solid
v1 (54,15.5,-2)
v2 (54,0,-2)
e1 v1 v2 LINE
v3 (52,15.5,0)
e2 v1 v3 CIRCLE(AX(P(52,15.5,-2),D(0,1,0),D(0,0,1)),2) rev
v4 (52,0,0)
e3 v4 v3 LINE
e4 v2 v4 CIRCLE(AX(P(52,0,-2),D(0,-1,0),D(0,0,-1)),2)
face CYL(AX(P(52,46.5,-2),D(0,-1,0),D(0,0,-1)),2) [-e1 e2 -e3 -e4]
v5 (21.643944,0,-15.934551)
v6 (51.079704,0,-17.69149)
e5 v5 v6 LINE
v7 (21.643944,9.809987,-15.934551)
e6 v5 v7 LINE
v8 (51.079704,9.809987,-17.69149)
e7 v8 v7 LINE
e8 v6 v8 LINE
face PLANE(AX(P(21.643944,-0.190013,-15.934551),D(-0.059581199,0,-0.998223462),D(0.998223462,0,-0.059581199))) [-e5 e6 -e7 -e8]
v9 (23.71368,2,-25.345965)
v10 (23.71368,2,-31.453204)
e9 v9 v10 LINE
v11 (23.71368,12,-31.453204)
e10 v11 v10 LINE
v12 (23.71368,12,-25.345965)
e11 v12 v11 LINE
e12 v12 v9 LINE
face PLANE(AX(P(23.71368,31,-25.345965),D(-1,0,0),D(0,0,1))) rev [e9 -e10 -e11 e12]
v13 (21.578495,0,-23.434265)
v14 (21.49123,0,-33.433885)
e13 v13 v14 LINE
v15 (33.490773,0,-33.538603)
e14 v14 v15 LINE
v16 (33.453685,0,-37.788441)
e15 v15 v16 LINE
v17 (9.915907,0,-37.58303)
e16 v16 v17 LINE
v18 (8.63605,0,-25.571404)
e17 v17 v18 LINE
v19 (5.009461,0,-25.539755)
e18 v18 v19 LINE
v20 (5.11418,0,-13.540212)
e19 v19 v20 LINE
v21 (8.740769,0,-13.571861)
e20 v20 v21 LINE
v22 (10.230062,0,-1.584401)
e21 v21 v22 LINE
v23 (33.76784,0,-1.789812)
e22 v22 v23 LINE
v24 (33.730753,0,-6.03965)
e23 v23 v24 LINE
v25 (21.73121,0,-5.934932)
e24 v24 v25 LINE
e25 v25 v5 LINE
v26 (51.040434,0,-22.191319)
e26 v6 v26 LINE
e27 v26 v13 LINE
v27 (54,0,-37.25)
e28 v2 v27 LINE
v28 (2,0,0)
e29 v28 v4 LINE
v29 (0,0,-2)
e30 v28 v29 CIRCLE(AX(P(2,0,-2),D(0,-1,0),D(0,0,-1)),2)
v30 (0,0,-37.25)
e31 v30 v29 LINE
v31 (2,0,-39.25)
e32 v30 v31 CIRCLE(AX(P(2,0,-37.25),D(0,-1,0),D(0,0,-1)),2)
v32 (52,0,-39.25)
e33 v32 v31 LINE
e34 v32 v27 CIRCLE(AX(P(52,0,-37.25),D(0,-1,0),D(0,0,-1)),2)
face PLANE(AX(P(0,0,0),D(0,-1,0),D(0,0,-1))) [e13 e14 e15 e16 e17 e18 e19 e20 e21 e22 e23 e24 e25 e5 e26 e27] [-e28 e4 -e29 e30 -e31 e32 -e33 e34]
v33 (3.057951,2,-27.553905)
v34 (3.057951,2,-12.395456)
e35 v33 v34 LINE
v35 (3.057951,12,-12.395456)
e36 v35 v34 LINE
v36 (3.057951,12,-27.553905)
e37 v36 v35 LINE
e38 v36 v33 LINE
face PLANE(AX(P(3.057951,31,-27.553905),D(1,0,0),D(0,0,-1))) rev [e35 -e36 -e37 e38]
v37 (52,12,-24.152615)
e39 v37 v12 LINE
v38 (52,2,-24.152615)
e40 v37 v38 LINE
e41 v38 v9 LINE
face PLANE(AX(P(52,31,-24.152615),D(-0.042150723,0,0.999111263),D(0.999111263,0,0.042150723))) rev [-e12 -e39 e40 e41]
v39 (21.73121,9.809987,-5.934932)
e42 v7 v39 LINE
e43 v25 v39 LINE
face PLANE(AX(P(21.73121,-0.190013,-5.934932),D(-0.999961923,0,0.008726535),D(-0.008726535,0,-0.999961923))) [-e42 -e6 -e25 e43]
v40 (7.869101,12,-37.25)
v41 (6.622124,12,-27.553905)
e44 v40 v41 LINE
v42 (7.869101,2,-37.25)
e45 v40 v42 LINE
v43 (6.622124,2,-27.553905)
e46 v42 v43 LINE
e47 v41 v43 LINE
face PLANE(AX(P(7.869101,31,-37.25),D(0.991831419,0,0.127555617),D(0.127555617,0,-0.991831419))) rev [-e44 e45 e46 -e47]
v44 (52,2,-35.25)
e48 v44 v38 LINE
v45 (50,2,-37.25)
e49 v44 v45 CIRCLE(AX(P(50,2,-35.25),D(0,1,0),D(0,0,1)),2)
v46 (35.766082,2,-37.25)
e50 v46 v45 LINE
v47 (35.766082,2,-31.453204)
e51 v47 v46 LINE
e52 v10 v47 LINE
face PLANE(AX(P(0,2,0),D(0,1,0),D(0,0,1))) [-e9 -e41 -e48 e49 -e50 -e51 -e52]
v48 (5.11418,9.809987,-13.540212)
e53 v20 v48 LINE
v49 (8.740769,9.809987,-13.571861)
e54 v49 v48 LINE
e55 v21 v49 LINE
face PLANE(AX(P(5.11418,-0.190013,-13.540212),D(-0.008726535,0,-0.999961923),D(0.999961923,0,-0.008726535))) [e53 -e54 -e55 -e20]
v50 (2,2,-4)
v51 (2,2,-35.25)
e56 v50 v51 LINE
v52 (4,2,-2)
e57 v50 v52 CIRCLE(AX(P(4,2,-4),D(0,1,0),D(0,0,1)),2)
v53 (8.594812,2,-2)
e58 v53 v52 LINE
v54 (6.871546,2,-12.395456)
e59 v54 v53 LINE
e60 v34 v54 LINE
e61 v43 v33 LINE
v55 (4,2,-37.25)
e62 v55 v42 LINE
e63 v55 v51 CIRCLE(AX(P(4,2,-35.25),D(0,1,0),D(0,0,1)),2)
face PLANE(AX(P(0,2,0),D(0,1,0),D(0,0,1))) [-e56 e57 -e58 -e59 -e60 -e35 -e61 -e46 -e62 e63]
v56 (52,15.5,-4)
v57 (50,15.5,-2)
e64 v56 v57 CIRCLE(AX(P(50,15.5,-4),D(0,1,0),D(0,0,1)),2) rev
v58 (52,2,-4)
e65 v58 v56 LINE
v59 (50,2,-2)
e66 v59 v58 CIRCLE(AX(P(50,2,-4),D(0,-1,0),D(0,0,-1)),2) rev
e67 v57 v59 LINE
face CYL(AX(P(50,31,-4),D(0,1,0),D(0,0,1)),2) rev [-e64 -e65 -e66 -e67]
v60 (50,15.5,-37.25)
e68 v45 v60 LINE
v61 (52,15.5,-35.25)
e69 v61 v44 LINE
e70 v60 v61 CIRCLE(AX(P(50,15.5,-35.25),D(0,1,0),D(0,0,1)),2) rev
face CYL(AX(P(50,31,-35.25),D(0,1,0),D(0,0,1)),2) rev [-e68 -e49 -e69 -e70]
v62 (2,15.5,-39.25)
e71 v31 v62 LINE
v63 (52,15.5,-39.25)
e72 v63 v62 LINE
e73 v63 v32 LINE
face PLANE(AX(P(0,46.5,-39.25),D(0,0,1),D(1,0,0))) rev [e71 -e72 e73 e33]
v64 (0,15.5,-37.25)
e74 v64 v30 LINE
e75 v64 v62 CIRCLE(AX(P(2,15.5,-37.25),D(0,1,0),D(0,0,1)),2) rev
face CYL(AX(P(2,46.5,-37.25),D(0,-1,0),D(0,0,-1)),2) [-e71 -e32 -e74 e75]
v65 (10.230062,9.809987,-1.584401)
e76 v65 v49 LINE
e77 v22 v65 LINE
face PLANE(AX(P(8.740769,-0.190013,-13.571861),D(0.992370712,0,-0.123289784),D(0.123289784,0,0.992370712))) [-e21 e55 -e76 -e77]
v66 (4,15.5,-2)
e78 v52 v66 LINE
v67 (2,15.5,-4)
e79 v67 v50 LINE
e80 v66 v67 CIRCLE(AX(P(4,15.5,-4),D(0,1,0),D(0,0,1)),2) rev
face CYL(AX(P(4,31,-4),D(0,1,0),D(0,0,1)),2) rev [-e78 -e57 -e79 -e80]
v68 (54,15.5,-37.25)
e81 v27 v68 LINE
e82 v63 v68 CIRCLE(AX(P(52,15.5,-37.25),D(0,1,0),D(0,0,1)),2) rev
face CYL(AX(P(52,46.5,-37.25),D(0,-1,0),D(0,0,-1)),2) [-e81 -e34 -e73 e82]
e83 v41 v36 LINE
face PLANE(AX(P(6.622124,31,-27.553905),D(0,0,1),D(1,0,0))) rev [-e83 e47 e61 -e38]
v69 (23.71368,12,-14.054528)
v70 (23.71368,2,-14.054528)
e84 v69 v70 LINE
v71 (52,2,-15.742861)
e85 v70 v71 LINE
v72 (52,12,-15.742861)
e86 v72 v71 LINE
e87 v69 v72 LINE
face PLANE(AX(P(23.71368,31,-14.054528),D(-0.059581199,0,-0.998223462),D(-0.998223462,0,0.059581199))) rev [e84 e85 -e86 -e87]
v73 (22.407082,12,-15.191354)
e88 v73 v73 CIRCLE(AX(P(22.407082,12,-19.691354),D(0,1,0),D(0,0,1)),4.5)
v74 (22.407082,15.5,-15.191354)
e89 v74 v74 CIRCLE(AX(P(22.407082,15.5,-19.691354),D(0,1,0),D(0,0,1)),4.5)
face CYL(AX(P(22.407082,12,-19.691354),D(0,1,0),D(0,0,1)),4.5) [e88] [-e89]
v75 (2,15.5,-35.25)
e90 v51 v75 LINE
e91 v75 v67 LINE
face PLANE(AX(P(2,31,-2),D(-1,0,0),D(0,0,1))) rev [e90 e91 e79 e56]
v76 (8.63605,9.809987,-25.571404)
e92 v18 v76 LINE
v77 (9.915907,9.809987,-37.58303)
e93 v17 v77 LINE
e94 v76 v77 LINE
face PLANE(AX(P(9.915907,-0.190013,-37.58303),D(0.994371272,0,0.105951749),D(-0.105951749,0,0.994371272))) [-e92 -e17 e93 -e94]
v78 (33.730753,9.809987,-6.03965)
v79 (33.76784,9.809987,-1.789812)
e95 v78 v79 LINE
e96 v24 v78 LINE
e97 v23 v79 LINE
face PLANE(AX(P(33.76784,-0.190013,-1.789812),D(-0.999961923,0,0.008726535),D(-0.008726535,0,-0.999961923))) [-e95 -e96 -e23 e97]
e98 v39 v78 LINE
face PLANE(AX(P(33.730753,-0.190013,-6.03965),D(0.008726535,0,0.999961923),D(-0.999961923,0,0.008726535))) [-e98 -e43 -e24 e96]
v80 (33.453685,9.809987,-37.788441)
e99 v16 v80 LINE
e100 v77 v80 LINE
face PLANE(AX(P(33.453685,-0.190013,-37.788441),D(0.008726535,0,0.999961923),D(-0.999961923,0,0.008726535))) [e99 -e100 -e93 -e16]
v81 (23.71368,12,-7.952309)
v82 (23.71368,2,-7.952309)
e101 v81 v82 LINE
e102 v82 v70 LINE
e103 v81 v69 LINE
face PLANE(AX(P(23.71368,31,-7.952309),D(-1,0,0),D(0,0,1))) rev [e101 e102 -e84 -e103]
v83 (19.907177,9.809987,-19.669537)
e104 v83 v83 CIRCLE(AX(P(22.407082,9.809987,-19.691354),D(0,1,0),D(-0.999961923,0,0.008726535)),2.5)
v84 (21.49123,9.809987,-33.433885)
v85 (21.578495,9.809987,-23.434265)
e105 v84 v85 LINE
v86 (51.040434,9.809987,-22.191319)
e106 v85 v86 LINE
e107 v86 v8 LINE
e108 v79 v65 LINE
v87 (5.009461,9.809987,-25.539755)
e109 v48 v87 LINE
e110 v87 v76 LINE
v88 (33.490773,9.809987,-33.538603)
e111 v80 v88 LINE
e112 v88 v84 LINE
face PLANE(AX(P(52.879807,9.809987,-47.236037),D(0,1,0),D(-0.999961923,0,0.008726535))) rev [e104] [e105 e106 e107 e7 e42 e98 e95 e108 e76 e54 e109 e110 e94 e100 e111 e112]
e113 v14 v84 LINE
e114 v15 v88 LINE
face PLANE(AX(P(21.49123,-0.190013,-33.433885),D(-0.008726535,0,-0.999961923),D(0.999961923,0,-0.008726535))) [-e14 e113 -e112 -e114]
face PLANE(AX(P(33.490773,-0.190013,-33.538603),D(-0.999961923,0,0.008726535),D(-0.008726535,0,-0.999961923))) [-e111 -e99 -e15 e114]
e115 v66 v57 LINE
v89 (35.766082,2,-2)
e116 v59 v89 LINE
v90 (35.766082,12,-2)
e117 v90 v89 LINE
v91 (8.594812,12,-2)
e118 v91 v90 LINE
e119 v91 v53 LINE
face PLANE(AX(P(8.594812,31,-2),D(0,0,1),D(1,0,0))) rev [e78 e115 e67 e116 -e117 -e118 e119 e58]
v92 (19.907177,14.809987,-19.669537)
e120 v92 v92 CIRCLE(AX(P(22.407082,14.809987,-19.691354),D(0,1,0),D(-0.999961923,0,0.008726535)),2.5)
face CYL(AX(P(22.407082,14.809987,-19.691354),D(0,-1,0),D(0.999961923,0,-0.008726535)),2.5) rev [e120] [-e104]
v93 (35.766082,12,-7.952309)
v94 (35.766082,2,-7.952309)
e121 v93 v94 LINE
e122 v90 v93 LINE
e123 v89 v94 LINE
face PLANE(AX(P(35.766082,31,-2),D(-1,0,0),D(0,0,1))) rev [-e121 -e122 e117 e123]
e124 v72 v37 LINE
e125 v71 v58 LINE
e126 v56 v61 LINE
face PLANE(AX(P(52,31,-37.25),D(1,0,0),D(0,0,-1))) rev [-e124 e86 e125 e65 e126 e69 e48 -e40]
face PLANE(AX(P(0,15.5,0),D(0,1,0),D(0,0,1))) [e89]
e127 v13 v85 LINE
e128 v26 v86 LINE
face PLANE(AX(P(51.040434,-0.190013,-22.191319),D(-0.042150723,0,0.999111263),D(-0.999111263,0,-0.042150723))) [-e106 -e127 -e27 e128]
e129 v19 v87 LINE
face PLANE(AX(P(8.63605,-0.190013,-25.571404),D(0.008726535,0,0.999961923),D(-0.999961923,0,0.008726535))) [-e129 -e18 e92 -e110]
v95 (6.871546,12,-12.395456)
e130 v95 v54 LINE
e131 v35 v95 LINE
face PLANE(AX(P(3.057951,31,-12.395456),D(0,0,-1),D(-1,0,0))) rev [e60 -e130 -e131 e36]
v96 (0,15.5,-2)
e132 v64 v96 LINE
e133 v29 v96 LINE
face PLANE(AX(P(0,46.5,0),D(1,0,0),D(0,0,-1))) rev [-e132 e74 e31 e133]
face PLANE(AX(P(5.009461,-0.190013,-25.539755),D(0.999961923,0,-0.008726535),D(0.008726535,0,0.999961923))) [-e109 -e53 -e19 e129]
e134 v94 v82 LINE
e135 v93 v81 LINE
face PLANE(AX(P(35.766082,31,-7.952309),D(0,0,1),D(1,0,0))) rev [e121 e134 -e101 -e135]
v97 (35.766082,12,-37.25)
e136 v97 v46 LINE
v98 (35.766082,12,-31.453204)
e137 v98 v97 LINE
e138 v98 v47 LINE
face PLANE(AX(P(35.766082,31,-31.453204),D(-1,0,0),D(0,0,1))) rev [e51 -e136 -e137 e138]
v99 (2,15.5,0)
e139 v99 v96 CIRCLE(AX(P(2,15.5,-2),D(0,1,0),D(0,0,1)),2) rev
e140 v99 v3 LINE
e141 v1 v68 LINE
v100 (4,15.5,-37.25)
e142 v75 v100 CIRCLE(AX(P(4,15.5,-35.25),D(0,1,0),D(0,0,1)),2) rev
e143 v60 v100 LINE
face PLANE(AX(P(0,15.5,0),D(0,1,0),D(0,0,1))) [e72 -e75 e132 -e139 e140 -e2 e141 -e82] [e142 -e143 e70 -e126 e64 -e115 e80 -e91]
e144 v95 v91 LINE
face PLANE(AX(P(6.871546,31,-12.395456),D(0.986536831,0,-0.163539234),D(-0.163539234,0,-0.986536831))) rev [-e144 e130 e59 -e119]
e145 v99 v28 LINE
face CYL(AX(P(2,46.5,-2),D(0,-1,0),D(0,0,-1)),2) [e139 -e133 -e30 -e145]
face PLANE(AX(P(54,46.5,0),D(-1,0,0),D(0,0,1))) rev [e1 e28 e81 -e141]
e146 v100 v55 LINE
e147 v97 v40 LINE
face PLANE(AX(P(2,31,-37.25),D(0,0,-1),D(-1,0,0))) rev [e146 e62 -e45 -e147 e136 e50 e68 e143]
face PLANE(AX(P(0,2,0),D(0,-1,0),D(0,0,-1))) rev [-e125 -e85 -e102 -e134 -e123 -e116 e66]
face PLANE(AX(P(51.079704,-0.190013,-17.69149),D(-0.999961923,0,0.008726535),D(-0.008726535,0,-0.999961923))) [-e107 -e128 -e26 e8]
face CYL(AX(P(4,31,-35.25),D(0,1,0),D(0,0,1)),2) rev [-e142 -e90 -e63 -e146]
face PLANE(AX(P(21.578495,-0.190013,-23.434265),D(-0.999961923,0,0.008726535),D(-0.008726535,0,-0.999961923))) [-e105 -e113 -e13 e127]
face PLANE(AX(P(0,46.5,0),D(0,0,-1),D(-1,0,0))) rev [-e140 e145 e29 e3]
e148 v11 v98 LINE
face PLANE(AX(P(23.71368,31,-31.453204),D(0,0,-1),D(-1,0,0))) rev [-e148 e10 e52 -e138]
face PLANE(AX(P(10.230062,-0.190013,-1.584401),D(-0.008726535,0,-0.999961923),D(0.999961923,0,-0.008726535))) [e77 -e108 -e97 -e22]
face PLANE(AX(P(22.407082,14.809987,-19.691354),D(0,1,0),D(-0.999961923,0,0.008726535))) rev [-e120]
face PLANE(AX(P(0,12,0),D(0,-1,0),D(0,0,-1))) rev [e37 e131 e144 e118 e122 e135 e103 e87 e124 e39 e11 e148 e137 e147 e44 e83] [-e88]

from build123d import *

# Parameters (mm, degrees)
SKETCH1_W              = 54
SKETCH1_H              = 39.25
BOSS_EXTRUDE1_DEPTH    = 46.5
FILLET1_R              = 2
FILLET2_R              = 2
Z_95_START             = -0.023652431
Z_95_BLANK_DEPTH       = 10
Z_95_START_2           = -5.023652431
Z_95_BLANK_2_OUTLINE_R = 2.5
Z_95_BLANK_2_DEPTH     = 5
BODY_MOVE_COPY3_ANGLE  = 180
BODY_MOVE_COPY4_ANGLE  = 89.5
SKETCH4_W              = 54
SKETCH4_H              = 39.25
CUT_EXTRUDE1_DEPTH     = 31
CUT_EXTRUDE2_DEPTH     = 31
BOSS_EXTRUDE2_DEPTH    = 2
FILLET3_R              = 2
FILLET4_R              = 2
FILLET5_R              = 2
FILLET6_R              = 2
SKETCH7_R              = 4.5
CUT_EXTRUDE3_DEPTH     = 3.5


with BuildPart() as part:
    # Sketch1 → Boss-Extrude1 (new body)
    with BuildSketch(Plane(origin=(0, 0, 0), x_dir=(1, 0, 0), z_dir=(0, 1, 0))):
        with Locations((27, 19.625)):
            Rectangle(SKETCH1_W, SKETCH1_H)
    extrude(amount=BOSS_EXTRUDE1_DEPTH)

    # Fillet1
    fillet1_edges = [part.edges().sort_by_distance(p)[0] for p in [
        (0, 23.25, 0),
    ]]
    fillet(fillet1_edges, radius=FILLET1_R)

    # Fillet2
    fillet2_edges = [part.edges().sort_by_distance(p)[0] for p in [
        (0, 23.25, -39.25),
        (54, 23.25, -39.25),
        (54, 23.25, 0),
    ]]
    fillet(fillet2_edges, radius=FILLET2_R)


with BuildPart() as body_2:
    # Z-95 Blank: read off the stored shape, not the designer's step
    # Z-95 Blank outline → Z-95 Blank (new body)
    with BuildSketch(Plane(origin=(0, 0, 0), x_dir=(1, 0, 0), z_dir=(0, 1, 0)).offset(Z_95_START)):
        Polygon((-39.475833264, 51.689675598), (-39.475833264, 48.062948495), (-51.475833264, 46.678320586), (-51.475833264, 23.139646129), (-47.225833264, 23.139646129), (-47.225833264, 35.139646129), (-37.225833264, 35.139646129), (-35.725833264, 5.689675598), (-31.225833264, 5.689675598), (-29.725833264, 35.139646129), (-19.725833264, 35.139646129), (-19.725833264, 23.139646129), (-15.475833264, 23.139646129), (-15.475833264, 46.678320586), (-27.475833264, 48.062948495), (-27.475833264, 51.689675598), align=None)
    extrude(amount=Z_95_BLANK_DEPTH)

    # Z-95 Blank 2 outline → Z-95 Blank 2 (add)
    with BuildSketch(Plane(origin=(0, 0, 0), x_dir=(1, 0, 0), z_dir=(0, 1, 0)).offset(Z_95_START_2)):
        with Locations((-33.475833264, 34.343753809)):
            Circle(Z_95_BLANK_2_OUTLINE_R)
    extrude(amount=Z_95_BLANK_2_DEPTH)


with BuildPart() as body_2_1:
    # Body-Move/Copy3: moved
    add(body_2.part.rotate(Axis((0, 2.476347569, -28.689675598), (1, 0, 0)), BODY_MOVE_COPY3_ANGLE))


with BuildPart() as body_2_2:
    # Body-Move/Copy4: moved
    add(body_2_1.part.rotate(Axis((-33.475833264, 0, -28.689675598), (0, -1, 0)), BODY_MOVE_COPY4_ANGLE))


with BuildPart() as body_2_3:
    # Body-Move/Copy5: moved
    add(body_2_2.part.moved(Location((61.536777905, 5.06338101, 8.948981511))))


with BuildPart() as body_2_4:
    # Body-Move/Copy6: moved
    add(body_2_3.part.moved(Location((0, -0.229742035, 0))))


with BuildPart() as part_1:
    add(part.part)

    # Intersect1: read off the stored shape, not the designer's step
    # Intersect1: cut body 2
    add(body_2_4.part, mode=Mode.SUBTRACT)

    # Sketch4 → Cut-Extrude1 (cut)
    with BuildSketch(Plane(origin=(0, 46.5, 0), x_dir=(1, 0, 0), z_dir=(0, 1, 0))):
        with Locations((27, 19.625)):
            Rectangle(SKETCH4_W, SKETCH4_H)
    extrude(amount=-CUT_EXTRUDE1_DEPTH, mode=Mode.SUBTRACT)

    # Sketch5 → Cut-Extrude2 (cut)
    with BuildSketch(Plane(origin=(0, 0, 0), x_dir=(-1, 0, 0), z_dir=(0, -1, 0))):
        Polygon((-23.713680343, 7.952308665), (-23.713680343, 14.054528407), (-52, 15.742860627), (-52, 2), (-35.766082295, 2), (-35.766082295, 7.952308665), align=None)
        Polygon((-23.713680343, 25.345964802), (-23.713680343, 31.453203507), (-35.766082295, 31.453203507), (-35.766082295, 37.25), (-52, 37.25), (-52, 24.152615413), align=None)
        Polygon((-6.871546498, 12.395456139), (-8.594812047, 2), (-2, 2), (-2, 37.25), (-7.869100925, 37.25), (-6.622123507, 27.553904956), (-3.057950712, 27.553904956), (-3.057950712, 12.395456139), align=None)
    extrude(amount=-CUT_EXTRUDE2_DEPTH, mode=Mode.SUBTRACT)

    # Sketch6 → Boss-Extrude2 (add)
    with BuildSketch(Plane.XZ):
        Polygon((52, -24.152615413), (23.713680343, -25.345964802), (23.713680343, -31.453203507), (35.766082295, -31.453203507), (35.766082295, -37.25), (52, -37.25), align=None)
        Polygon((52, -15.742860627), (23.713680343, -14.054528407), (23.713680343, -7.952308665), (35.766082295, -7.952308665), (35.766082295, -2), (52, -2), align=None)
        Polygon((8.594812047, -2), (6.871546498, -12.395456139), (3.057950712, -12.395456139), (3.057950712, -27.553904956), (6.622123507, -27.553904956), (7.869100925, -37.25), (2, -37.25), (2, -2), align=None)
    extrude(amount=-BOSS_EXTRUDE2_DEPTH)

    # Fillet3
    fillet3_edges = [part_1.edges().sort_by_distance(p)[0] for p in [
        (52, 8.75, -2),
    ]]
    fillet(fillet3_edges, radius=FILLET3_R)

    # Fillet4
    fillet4_edges = [part_1.edges().sort_by_distance(p)[0] for p in [
        (2, 8.75, -2),
    ]]
    fillet(fillet4_edges, radius=FILLET4_R)

    # Fillet5
    fillet5_edges = [part_1.edges().sort_by_distance(p)[0] for p in [
        (52, 8.75, -37.25),
    ]]
    fillet(fillet5_edges, radius=FILLET5_R)

    # Fillet6
    fillet6_edges = [part_1.edges().sort_by_distance(p)[0] for p in [
        (2, 8.75, -37.25),
    ]]
    fillet(fillet6_edges, radius=FILLET6_R)

    # Sketch7 → Cut-Extrude3 (cut)
    with BuildSketch(Plane(origin=(0, 15.5, 0), x_dir=(1, 0, 0), z_dir=(0, 1, 0))):
        Polygon((7.869100925, 37.25), (35.766082295, 37.25), (35.766082295, 31.453203507), (23.713680343, 31.453203507), (23.713680343, 25.345964802), (52, 24.152615413), (52, 15.742860627), (23.713680343, 14.054528407), (23.713680343, 7.952308665), (35.766082295, 7.952308665), (35.766082295, 2), (8.594812047, 2), (6.871546498, 12.395456139), (3.057950712, 12.395456139), (3.057950712, 27.553904956), (6.622123507, 27.553904956), align=None)
        with Locations(Location((22.40708172, 19.691353573, 0), (0, 0, 270))):
            Circle(SKETCH7_R, mode=Mode.SUBTRACT)
    extrude(amount=-CUT_EXTRUDE3_DEPTH, mode=Mode.SUBTRACT)


solid = part_1.part
